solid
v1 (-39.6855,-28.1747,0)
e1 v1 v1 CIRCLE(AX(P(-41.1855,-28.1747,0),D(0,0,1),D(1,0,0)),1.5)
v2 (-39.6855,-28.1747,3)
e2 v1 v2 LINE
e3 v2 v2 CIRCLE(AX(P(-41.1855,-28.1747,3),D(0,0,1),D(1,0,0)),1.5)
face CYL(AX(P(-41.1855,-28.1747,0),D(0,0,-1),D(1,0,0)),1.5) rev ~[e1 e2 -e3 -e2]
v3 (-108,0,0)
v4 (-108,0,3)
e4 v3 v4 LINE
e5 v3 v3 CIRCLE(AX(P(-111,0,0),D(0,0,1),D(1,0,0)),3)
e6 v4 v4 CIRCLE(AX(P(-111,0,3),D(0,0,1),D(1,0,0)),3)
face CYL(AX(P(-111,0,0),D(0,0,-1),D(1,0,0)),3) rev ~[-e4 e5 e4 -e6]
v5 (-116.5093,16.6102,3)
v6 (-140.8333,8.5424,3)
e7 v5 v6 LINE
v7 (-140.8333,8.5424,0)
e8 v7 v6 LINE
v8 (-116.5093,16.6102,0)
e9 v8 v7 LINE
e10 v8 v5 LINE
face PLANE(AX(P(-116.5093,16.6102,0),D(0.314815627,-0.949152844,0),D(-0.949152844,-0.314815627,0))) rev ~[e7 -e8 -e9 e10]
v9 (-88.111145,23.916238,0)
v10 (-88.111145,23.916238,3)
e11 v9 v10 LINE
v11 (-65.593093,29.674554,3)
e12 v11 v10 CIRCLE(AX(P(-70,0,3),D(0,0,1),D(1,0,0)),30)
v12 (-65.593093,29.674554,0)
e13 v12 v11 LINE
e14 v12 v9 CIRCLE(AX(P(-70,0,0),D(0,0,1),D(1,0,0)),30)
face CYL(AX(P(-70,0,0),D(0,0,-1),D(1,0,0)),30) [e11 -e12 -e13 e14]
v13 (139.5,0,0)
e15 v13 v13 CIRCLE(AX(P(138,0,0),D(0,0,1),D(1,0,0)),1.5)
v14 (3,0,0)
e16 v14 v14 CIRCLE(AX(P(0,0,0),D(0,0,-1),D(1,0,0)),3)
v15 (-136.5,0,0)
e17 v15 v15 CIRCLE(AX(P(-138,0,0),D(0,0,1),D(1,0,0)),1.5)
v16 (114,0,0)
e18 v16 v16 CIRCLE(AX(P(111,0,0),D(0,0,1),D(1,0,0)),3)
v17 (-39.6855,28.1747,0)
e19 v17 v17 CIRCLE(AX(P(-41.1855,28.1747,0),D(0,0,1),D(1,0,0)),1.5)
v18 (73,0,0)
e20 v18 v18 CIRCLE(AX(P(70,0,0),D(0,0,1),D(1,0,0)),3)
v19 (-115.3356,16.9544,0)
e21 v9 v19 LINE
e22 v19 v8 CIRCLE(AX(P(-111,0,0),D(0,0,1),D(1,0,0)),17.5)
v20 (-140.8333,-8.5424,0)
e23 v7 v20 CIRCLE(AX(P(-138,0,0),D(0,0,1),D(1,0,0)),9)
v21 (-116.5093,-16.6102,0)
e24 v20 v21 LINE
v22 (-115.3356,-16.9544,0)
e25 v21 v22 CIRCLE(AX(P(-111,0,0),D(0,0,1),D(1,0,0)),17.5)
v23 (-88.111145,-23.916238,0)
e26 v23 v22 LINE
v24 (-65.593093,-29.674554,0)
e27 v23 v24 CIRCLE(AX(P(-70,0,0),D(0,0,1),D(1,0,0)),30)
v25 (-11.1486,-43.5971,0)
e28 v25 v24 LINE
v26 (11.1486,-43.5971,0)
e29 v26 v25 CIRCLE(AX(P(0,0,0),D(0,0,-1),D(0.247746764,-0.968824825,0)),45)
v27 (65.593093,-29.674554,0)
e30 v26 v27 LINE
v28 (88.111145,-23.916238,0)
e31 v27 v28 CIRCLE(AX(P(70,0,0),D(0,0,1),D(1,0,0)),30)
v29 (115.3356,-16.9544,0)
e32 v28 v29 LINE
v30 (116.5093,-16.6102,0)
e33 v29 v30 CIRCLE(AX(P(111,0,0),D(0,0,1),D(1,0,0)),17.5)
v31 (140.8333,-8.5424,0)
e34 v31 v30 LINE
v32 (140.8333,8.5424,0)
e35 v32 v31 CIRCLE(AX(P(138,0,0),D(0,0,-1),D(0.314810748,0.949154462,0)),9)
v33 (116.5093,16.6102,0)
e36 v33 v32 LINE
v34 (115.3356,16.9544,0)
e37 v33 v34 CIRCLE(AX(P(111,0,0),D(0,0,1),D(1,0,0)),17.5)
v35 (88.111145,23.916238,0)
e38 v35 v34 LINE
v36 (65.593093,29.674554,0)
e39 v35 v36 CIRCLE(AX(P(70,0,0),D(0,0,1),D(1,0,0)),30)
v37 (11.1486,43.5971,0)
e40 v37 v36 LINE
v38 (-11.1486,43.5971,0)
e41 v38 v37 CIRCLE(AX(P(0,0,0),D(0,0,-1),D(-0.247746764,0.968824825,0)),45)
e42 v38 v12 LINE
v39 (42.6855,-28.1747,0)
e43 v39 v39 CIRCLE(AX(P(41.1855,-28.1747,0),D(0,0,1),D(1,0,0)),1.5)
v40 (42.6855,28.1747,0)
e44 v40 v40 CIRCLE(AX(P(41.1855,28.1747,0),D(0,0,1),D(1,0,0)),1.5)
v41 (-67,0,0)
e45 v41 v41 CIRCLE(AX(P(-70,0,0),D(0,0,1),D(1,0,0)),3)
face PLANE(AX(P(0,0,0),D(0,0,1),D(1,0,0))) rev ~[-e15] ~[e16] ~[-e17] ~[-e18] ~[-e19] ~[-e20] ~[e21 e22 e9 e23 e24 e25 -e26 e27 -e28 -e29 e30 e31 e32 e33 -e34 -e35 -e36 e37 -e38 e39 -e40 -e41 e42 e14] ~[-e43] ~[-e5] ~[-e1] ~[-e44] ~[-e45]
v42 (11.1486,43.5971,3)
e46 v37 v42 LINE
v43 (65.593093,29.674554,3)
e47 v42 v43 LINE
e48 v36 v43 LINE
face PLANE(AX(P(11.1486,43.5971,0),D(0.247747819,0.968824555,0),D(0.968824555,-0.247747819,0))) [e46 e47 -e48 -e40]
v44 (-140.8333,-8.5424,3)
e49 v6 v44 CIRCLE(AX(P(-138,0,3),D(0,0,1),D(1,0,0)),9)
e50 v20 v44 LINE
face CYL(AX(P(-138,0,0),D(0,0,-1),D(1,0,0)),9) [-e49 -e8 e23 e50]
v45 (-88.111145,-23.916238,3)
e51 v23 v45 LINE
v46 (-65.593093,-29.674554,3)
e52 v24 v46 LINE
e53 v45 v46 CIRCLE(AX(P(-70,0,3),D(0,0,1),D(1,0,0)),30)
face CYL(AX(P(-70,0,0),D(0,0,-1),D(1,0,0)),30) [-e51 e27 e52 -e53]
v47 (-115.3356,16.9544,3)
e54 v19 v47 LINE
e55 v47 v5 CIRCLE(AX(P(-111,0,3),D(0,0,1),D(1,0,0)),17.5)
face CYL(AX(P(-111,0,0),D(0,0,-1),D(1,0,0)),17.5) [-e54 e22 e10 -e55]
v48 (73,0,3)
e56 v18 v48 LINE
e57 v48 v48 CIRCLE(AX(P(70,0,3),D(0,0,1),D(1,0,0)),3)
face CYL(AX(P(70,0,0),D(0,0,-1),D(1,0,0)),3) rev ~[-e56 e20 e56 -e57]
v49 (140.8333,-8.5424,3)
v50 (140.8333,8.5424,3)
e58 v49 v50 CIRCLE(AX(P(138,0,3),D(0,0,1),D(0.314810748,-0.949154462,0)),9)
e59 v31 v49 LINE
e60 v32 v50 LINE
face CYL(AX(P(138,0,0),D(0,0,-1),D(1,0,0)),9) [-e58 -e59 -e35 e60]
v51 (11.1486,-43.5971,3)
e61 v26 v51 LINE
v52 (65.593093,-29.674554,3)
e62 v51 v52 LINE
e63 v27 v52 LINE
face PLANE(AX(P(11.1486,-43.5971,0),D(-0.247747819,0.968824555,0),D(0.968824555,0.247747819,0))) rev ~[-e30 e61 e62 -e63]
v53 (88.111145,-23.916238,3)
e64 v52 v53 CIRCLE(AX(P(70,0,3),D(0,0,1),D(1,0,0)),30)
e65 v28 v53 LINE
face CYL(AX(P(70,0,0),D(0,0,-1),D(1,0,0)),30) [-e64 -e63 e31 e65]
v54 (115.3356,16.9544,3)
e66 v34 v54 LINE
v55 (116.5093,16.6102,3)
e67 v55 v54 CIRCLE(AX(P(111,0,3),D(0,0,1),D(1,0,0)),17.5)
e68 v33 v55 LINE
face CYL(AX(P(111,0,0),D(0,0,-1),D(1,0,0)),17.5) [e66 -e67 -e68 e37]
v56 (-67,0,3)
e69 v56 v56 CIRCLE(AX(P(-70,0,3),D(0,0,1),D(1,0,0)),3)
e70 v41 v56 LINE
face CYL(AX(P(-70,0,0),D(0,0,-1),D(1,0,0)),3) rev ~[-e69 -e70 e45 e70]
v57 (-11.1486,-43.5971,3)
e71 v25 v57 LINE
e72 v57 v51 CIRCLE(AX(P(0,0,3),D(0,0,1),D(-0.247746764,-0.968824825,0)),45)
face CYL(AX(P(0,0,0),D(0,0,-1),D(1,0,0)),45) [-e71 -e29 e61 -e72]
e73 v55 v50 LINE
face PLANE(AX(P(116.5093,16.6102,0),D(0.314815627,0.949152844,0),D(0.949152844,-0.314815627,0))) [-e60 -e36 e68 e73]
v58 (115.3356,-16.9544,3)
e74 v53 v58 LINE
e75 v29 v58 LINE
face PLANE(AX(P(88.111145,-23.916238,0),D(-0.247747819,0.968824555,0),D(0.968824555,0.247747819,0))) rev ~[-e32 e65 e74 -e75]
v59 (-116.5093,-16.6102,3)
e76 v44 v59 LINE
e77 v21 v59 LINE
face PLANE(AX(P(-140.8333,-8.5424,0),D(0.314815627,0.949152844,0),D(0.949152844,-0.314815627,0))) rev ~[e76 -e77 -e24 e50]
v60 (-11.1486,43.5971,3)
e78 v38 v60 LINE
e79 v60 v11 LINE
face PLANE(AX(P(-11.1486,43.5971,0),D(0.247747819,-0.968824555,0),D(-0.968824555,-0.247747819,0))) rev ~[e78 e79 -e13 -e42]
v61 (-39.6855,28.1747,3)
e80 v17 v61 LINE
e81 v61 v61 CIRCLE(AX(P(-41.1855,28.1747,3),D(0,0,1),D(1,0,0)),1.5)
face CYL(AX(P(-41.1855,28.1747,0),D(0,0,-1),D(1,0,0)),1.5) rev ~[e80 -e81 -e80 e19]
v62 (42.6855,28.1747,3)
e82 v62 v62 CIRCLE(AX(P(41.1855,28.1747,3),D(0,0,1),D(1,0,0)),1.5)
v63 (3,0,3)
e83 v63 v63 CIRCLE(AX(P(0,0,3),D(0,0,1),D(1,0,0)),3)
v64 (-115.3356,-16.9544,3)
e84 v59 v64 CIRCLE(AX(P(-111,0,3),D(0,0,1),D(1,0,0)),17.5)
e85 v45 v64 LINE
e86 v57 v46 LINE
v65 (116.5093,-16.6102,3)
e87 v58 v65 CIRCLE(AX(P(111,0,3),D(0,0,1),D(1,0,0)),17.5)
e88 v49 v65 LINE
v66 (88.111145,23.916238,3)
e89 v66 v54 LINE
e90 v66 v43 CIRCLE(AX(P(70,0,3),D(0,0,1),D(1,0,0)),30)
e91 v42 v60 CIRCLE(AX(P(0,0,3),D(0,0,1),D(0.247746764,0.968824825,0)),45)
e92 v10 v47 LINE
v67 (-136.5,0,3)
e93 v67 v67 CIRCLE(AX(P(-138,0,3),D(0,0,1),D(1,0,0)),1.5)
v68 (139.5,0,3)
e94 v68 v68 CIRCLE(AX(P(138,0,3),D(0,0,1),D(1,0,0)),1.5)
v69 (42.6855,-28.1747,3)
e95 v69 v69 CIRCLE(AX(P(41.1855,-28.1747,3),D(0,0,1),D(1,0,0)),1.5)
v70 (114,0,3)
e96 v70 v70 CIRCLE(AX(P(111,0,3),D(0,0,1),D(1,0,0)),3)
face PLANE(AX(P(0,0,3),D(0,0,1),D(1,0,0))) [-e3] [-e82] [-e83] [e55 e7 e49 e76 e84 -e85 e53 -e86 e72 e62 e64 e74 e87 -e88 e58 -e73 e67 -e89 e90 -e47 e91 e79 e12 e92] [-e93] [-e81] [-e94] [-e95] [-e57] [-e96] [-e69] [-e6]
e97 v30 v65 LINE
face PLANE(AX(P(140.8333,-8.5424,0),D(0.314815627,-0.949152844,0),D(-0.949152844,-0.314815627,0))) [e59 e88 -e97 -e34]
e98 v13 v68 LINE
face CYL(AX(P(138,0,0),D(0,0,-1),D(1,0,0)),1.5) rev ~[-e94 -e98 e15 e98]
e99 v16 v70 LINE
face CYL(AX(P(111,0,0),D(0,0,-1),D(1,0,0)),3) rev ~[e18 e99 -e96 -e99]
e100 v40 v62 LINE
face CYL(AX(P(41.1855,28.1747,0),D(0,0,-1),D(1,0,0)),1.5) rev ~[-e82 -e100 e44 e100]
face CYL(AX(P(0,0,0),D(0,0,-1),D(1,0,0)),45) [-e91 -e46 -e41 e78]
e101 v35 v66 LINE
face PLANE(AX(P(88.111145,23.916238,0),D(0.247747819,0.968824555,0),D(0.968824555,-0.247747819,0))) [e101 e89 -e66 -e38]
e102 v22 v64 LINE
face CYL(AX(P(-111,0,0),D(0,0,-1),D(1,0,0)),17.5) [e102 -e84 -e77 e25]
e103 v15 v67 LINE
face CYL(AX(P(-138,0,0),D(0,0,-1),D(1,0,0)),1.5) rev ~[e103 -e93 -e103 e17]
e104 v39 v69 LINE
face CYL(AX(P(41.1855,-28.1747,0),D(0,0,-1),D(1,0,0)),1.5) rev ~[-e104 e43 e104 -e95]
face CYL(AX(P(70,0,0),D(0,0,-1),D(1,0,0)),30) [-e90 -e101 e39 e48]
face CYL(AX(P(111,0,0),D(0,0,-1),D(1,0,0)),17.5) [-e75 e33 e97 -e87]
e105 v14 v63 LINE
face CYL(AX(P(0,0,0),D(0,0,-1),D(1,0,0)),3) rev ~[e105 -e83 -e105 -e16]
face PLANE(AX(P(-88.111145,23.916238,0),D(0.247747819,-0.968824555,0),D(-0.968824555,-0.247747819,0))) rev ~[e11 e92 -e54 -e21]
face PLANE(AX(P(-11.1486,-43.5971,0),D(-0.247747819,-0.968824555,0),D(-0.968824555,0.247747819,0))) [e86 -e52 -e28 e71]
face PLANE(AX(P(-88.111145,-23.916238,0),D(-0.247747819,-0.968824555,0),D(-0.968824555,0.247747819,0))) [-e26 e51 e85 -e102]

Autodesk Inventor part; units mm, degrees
ref_plane "YZ Plane" through (0, 0, 0) normal (1, 0, 0) x (0, 1, 0)
ref_plane "XZ Plane" through (0, 0, 0) normal (0, 1, 0) x (-1, 0, 0)
ref_plane "XY Plane" through (0, 0, 0) normal (0, 0, 1) x (1, 0, 0)
sketch "Sketch1" plane through (0, 0, 0) normal (0, 0, 1) x (1, 0, 0)
  circle A0 centre (0, 0) radius 45
  circle A1 centre (70, 0) radius 30
  circle A2 centre (111, 0) radius 17.5
  circle A3 centre (138, 0) radius 9
  circle A4 centre (-70, 0) radius 30
  circle A5 centre (-111, 0) radius 17.5
  circle A6 centre (-138, 0) radius 9
  line L0 (-11.1486, 43.5971) -> (-115.3356, 16.9544)
  line L1 (11.1486, 43.5971) -> (115.3356, 16.9544)
  line L2 (-116.5093, 16.6102) -> (-140.8333, 8.5424)
  line L3 (116.5093, 16.6102) -> (140.8333, 8.5424)
  line L4 (-11.1486, -43.5971) -> (-115.3356, -16.9544)
  line L5 (11.1486, -43.5971) -> (115.3356, -16.9544)
  line L6 (140.8333, -8.5424) -> (116.5093, -16.6102)
  line L7 (-140.8333, -8.5424) -> (-116.5093, -16.6102)
  circle A7 centre (-138, 0) radius 1.5
  circle A8 centre (-111, 0) radius 3
  circle A9 centre (-70, 0) radius 3
  circle A10 centre (0, 0) radius 3
  circle A11 centre (70, 0) radius 3
  circle A12 centre (111, 0) radius 3
  circle A13 centre (138, 0) radius 1.5
  line L8 (-123.0921, -97.5699) -> (-152.3126, 20.9991) construction
  line L9 (-152.3126, 20.9991) -> (130.841, 90.7804) construction
  line L10 (130.841, 90.7804) -> (160.0615, -27.7887) construction
  line L11 (160.0615, -27.7887) -> (-123.0921, -97.5699) construction
  circle A14 centre (-41.1855, -28.1747) radius 1.5
  circle A15 centre (-41.1855, 28.1747) radius 1.5
  circle A16 centre (41.1855, 28.1747) radius 1.5
  circle A17 centre (41.1855, -28.1747) radius 1.5
  line L12 (0, 45) -> (0, -45)
  line L13 (-37.7402, 24.5088) -> (37.7402, -24.5088)
  line L14 (-37.7402, -24.5088) -> (37.7402, 24.5088)
  line L15 (-45, 0) -> (45, 0)
  point P0 (-88.1111, 23.9163)
  point P1 (-88.1111, -23.9163)
  point P2 (-65.5931, -29.6746)
  point P3 (65.5931, -29.6746)
  point P4 (88.1111, -23.9163)
  point P5 (88.1111, 23.9163)
  point P6 (65.5931, 29.6746)
  point P7 (-65.5931, 29.6746)
  point P8 (0, 0)
  dimension "d0" = 90
  dimension "d1" = 60
  dimension "d2" = 70
  dimension "d3" = 35
  dimension "d4" = 41
  dimension "d5" = 18
  dimension "d6" = 27
  dimension "d7" = 0
  dimension "d8" = 0
  dimension "d9" = 0
  dimension "d10" = 60
  dimension "d11" = 35
  dimension "d12" = 41
  dimension "d13" = 18
  dimension "d16" = 70
  dimension "d17" = 0
  dimension "d18" = 0
  dimension "d19" = 0
  dimension "d20" = 27
  dimension "d23" = 6
  dimension "d24" = 6
  dimension "d25" = 6
  dimension "d26" = 3
  dimension "d27" = 6
  dimension "d28" = 6
  dimension "d29" = 3
  dimension "d109" = 0.5
  dimension "d121" = 7.5
  dimension "d133" = 3
  dimension "d138" = 8.8
  dimension "d139" = 3.4005
  dimension "d140" = 3
  dimension "d141" = 3
  dimension "d142" = 3
  dimension "d143" = 7.5
  dimension "d145" = 8.8
  dimension "d146" = 7.5
  dimension "d148" = 8.8
  dimension "d151" = 8.8
  dimension "d152" = 3.4005
  dimension "d153" = 3.4005
  dimension "d155" = 7.5
  dimension "d156" = 3.4005
  dimension "d157" = 57
  dimension "d159" = 57
extrude "Extrusion1" add sketch "Sketch1" along normal blind 3 contours L14 A10 L12 A0 | A0 L1 A1 | A0 A1 L15 A10 L14 | A1 L1 A2 L5 A0 | A0 L15 A1 | L12 A10 L13 A0 | A1 L1 | A0 A1 L15 | A1 A0 L13 A10 L15 | A0 A4 L0 | L1 A2 A1 | A1 L5 A0 | L13 A0 L12 A10 | A10 L15 A4 A0 L13 | L12 A0 L14 A10 | L14 A0 A4 L15 A10 | L0 A4 | A4 A0 L4 A5 L0 | A2 A1 | A1 A2 | L5 A1 | A0 L4 A4 | L15 A0 A4 | A4 A0 L15 | A4 A5 L0 | A2 L5 A1 | L3 A3 L6 A2 | A5 A4 | A4 A5 | A3 | A4 L4 | A4 L4 A5 | A5 L7 A6 L2 | A6
equation "\"BendRadius\" = Thickness"
equation "\"BendReliefWidth\" = Thickness"
equation "\"BendReliefDepth\" = 0.5 * Thickness"
equation "\"CornerReliefSize\" = 4 * Thickness"
equation "\"MinimumRemnant\" = 2 * Thickness"
equation "\"TransitionRadius\" = BendRadius"
equation "\"JacobiRadiusSize\" = BendRadius"
equation "\"GapSize\" = Thickness"
equation "\"Thickness\" = 3"
properties part number "frame" material "PMMA Plastic"
